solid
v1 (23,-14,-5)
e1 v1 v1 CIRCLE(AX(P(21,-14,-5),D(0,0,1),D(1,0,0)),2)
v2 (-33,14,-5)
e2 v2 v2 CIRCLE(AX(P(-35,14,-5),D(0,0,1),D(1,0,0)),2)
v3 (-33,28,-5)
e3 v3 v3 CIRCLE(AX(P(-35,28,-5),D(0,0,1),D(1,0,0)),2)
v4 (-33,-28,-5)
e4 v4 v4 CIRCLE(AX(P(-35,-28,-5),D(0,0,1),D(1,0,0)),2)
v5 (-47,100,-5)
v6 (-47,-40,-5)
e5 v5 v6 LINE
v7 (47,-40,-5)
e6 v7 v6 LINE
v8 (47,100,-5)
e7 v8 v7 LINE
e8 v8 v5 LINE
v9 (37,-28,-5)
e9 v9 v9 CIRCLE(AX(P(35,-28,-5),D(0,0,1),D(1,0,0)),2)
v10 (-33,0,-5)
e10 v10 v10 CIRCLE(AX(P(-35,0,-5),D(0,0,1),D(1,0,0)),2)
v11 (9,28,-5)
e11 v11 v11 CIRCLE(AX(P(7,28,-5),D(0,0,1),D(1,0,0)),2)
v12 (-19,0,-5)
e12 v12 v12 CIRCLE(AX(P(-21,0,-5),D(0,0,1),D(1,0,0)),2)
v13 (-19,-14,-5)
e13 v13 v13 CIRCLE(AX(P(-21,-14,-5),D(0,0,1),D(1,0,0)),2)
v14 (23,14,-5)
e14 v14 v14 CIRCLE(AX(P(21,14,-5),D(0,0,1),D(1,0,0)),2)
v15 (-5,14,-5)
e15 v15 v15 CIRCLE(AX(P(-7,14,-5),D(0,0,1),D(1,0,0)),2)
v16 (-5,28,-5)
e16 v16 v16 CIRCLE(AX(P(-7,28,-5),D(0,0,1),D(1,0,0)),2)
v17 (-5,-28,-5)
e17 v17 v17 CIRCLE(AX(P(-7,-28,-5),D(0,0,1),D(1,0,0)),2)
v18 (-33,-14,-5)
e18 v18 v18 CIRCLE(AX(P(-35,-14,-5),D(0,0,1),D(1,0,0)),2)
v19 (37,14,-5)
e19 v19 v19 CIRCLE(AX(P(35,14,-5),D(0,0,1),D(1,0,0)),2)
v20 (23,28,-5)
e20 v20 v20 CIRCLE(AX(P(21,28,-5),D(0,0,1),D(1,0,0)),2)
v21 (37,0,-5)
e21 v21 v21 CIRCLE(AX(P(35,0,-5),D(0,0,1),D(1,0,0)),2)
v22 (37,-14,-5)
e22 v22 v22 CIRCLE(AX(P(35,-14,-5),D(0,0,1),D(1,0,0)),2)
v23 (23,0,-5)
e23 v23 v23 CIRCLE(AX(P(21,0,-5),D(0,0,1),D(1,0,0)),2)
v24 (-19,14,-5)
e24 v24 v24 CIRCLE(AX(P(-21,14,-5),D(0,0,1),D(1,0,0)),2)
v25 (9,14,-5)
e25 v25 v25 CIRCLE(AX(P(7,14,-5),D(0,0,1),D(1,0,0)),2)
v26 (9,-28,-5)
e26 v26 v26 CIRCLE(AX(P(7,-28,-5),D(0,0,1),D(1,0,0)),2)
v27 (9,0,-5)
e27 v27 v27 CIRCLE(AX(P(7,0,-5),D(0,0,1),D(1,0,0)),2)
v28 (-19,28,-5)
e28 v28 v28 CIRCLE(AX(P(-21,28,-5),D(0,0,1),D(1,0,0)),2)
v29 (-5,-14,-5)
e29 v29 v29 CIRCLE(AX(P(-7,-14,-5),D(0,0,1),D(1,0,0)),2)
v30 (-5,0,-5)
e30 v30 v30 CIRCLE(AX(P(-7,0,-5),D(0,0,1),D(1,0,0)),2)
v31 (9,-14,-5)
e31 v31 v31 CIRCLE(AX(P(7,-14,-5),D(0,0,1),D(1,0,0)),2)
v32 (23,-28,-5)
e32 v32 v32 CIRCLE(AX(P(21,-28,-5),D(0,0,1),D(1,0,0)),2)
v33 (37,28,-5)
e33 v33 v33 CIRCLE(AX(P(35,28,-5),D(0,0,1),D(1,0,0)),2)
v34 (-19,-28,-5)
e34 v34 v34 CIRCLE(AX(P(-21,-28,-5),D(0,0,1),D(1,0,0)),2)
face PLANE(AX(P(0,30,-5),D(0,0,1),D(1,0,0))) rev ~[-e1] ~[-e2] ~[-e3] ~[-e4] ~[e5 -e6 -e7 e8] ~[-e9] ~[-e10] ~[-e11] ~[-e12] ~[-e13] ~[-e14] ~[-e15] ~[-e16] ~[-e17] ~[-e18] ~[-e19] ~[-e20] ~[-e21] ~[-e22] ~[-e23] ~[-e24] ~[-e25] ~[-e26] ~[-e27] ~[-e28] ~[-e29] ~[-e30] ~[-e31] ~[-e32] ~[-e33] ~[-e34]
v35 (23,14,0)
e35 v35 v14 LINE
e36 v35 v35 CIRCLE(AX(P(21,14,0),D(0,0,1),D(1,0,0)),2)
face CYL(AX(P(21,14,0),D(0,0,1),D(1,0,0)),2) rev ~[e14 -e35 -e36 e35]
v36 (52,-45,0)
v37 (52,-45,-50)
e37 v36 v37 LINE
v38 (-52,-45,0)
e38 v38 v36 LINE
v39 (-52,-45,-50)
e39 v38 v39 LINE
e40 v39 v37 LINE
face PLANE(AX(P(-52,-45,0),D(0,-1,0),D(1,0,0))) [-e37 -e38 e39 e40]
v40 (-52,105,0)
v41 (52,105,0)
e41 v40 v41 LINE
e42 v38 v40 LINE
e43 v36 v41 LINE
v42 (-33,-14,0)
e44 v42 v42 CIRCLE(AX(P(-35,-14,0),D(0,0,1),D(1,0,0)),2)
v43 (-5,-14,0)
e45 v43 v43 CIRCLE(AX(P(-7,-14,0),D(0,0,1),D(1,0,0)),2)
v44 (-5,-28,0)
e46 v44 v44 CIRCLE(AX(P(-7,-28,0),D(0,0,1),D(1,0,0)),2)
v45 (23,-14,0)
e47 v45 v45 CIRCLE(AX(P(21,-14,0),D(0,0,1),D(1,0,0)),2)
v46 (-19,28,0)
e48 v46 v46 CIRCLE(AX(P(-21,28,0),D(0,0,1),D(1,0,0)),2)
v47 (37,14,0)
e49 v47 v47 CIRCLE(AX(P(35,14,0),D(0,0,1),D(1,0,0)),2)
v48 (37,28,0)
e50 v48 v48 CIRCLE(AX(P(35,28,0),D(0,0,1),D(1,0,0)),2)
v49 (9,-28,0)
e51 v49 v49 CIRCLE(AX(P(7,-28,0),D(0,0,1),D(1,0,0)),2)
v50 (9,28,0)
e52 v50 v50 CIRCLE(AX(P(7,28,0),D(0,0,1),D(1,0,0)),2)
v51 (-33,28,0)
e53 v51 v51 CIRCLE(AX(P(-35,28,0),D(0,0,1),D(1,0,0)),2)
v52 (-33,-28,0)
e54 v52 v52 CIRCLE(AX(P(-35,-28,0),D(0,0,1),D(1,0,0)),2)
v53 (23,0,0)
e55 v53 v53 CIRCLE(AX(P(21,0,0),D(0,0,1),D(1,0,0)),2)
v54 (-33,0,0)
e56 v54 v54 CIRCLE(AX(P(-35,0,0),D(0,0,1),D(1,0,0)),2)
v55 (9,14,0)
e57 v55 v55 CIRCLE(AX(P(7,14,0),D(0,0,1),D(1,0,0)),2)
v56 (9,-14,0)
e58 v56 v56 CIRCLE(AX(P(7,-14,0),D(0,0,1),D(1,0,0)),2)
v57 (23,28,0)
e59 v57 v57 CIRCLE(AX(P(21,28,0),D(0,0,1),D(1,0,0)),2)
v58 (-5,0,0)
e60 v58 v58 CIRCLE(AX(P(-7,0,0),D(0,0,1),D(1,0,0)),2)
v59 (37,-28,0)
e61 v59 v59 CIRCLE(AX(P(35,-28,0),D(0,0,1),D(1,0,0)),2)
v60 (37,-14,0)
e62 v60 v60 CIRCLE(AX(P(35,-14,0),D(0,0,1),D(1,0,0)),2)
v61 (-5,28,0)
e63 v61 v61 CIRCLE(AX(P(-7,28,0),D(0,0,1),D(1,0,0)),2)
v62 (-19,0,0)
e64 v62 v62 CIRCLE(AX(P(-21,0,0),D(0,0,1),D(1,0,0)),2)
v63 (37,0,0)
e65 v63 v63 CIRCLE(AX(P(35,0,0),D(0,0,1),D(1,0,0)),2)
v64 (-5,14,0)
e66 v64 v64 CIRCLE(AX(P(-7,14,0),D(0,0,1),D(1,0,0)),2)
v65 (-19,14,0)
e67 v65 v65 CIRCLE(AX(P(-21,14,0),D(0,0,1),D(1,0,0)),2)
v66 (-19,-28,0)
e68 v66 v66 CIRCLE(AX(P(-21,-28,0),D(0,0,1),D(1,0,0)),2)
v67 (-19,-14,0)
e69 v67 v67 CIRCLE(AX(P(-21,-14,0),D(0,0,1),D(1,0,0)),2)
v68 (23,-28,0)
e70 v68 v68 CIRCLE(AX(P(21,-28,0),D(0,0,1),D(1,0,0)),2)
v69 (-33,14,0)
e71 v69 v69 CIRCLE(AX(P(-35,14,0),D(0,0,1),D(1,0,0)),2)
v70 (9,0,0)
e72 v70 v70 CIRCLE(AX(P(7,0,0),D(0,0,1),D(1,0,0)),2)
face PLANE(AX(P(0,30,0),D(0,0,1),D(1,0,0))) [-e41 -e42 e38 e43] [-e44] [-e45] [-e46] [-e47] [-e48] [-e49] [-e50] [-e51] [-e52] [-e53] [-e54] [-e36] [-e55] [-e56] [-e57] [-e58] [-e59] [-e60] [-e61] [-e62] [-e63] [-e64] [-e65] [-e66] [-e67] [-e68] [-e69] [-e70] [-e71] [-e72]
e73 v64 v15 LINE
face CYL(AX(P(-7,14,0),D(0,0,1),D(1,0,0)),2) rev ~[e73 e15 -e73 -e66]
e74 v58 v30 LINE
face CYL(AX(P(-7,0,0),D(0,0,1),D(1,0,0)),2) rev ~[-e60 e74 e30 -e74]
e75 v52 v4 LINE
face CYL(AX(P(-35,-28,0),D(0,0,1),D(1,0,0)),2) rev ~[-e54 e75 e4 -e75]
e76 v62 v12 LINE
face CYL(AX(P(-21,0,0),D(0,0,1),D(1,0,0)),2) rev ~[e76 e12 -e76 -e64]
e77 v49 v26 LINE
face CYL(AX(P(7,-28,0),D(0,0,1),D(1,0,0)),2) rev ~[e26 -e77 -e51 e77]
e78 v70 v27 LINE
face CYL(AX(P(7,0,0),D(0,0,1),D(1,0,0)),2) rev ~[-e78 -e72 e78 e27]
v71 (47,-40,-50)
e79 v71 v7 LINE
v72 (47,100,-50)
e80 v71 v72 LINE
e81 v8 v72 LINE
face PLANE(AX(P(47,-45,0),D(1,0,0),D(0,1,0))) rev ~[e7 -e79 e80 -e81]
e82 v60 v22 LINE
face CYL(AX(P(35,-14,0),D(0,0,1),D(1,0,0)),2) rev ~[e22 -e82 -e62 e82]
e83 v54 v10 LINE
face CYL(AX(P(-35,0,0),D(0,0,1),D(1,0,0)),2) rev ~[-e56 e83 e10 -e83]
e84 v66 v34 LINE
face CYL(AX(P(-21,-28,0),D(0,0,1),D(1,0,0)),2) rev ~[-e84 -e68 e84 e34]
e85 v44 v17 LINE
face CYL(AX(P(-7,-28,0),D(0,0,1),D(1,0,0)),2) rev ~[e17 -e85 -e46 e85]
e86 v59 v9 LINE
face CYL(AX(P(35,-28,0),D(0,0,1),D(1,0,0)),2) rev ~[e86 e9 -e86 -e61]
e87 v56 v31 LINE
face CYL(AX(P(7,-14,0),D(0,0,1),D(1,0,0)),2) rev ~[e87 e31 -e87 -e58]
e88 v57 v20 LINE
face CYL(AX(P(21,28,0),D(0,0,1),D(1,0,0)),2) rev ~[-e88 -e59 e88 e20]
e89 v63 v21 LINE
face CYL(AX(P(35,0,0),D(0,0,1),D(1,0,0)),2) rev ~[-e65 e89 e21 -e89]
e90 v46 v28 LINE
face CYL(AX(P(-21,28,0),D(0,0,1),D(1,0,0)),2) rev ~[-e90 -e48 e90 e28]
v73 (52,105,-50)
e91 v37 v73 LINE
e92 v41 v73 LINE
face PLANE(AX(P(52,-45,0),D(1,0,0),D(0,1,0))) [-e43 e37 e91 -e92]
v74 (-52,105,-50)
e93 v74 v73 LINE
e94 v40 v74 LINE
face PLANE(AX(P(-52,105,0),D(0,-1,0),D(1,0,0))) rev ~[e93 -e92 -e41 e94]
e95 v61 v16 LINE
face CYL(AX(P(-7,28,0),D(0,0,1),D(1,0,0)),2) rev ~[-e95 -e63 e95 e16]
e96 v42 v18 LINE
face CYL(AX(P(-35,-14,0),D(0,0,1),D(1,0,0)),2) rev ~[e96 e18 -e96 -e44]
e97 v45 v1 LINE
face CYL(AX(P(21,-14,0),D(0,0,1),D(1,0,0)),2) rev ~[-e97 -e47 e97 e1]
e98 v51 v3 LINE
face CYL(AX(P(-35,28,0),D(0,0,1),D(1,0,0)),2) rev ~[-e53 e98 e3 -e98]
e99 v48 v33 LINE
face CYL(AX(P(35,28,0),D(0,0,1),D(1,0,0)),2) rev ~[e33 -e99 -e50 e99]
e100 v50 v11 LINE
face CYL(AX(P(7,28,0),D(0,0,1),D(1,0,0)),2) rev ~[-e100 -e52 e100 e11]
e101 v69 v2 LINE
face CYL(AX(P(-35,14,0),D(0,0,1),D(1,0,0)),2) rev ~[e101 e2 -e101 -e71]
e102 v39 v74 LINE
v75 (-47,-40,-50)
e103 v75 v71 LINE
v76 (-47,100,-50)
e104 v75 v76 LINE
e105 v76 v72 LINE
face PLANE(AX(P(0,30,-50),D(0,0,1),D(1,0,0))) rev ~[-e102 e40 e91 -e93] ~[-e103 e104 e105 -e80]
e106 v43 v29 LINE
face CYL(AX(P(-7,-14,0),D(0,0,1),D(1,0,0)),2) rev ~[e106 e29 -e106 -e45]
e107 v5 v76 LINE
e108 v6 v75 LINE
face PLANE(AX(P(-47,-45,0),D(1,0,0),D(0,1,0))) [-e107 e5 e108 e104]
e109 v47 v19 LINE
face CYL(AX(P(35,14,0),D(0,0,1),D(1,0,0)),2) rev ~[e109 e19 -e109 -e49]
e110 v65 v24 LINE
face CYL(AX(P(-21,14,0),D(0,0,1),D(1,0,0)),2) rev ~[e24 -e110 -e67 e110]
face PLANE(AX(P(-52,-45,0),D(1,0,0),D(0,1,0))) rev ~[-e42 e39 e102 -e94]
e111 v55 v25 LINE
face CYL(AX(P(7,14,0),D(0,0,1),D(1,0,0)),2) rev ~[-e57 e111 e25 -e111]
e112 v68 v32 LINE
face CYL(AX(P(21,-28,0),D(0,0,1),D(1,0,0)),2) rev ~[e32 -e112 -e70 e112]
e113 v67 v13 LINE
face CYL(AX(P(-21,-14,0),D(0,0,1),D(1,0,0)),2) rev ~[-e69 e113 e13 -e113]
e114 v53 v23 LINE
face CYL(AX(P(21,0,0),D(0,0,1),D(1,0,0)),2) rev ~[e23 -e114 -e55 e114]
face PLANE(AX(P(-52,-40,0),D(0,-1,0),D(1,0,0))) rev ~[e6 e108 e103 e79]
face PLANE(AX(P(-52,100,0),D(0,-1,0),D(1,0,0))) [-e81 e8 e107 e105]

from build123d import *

# Parameters (mm, degrees)
F0_W     = 104
F0_H     = 150
F0_R     = 2
F1_DEPTH = 50
F2_T     = -5
F3_DEPTH = 25


# Not quite as in the source:
# - a feature names something its author has since deleted; it is built from what else it names


with BuildPart() as f1:
    # F0 (on Top) → F1 (new body)
    with BuildSketch(Plane.XY):
        with Locations((0, 30)):
            Rectangle(F0_W, F0_H)
        with Locations((-35, -28)):
            Circle(F0_R, mode=Mode.SUBTRACT)
        with Locations((-35, -14)):
            Circle(F0_R, mode=Mode.SUBTRACT)
        with Locations((-21, -28)):
            Circle(F0_R, mode=Mode.SUBTRACT)
        with Locations((-7, -28)):
            Circle(F0_R, mode=Mode.SUBTRACT)
        with Locations((-21, -14)):
            Circle(F0_R, mode=Mode.SUBTRACT)
        with Locations((-7, -14)):
            Circle(F0_R, mode=Mode.SUBTRACT)
        with Locations((-35, 0)):
            Circle(F0_R, mode=Mode.SUBTRACT)
        with Locations((-35, 14)):
            Circle(F0_R, mode=Mode.SUBTRACT)
        with Locations((-35, 28)):
            Circle(F0_R, mode=Mode.SUBTRACT)
        with Locations((-21, 0)):
            Circle(F0_R, mode=Mode.SUBTRACT)
        with Locations((-7, 0)):
            Circle(F0_R, mode=Mode.SUBTRACT)
        with Locations((-21, 14)):
            Circle(F0_R, mode=Mode.SUBTRACT)
        with Locations((-21, 28)):
            Circle(F0_R, mode=Mode.SUBTRACT)
        with Locations((-7, 14)):
            Circle(F0_R, mode=Mode.SUBTRACT)
        with Locations((-7, 28)):
            Circle(F0_R, mode=Mode.SUBTRACT)
        with Locations((7, -28)):
            Circle(F0_R, mode=Mode.SUBTRACT)
        with Locations((21, -28)):
            Circle(F0_R, mode=Mode.SUBTRACT)
        with Locations((7, -14)):
            Circle(F0_R, mode=Mode.SUBTRACT)
        with Locations((21, -14)):
            Circle(F0_R, mode=Mode.SUBTRACT)
        with Locations((35, -28)):
            Circle(F0_R, mode=Mode.SUBTRACT)
        with Locations((35, -14)):
            Circle(F0_R, mode=Mode.SUBTRACT)
        with Locations((7, 0)):
            Circle(F0_R, mode=Mode.SUBTRACT)
        with Locations((21, 0)):
            Circle(F0_R, mode=Mode.SUBTRACT)
        with Locations((7, 14)):
            Circle(F0_R, mode=Mode.SUBTRACT)
        with Locations((7, 28)):
            Circle(F0_R, mode=Mode.SUBTRACT)
        with Locations((21, 14)):
            Circle(F0_R, mode=Mode.SUBTRACT)
        with Locations((21, 28)):
            Circle(F0_R, mode=Mode.SUBTRACT)
        with Locations((35, 0)):
            Circle(F0_R, mode=Mode.SUBTRACT)
        with Locations((35, 14)):
            Circle(F0_R, mode=Mode.SUBTRACT)
        with Locations((35, 28)):
            Circle(F0_R, mode=Mode.SUBTRACT)
        with Locations((7, -28)):
            Circle(F0_R)
        with Locations((35, 14)):
            Circle(F0_R)
        with Locations((21, 0)):
            Circle(F0_R)
        with Locations((21, 28)):
            Circle(F0_R)
        with Locations((7, 28)):
            Circle(F0_R)
        with Locations((35, -28)):
            Circle(F0_R)
        with Locations((-7, -14)):
            Circle(F0_R)
        with Locations((-7, -28)):
            Circle(F0_R)
        with Locations((7, 14)):
            Circle(F0_R)
        with Locations((-35, 28)):
            Circle(F0_R)
        with Locations((-35, 14)):
            Circle(F0_R)
        with Locations((-35, 0)):
            Circle(F0_R)
        with Locations((-35, -14)):
            Circle(F0_R)
        with Locations((-35, -28)):
            Circle(F0_R)
        with Locations((-21, 28)):
            Circle(F0_R)
        with Locations((-21, 14)):
            Circle(F0_R)
        with Locations((-21, 0)):
            Circle(F0_R)
        with Locations((-21, -14)):
            Circle(F0_R)
        with Locations((-21, -28)):
            Circle(F0_R)
        with Locations((-7, 28)):
            Circle(F0_R)
        with Locations((-7, 14)):
            Circle(F0_R)
        with Locations((-7, 0)):
            Circle(F0_R)
        with Locations((35, 0)):
            Circle(F0_R)
        with Locations((21, -14)):
            Circle(F0_R)
        with Locations((21, 14)):
            Circle(F0_R)
        with Locations((7, 0)):
            Circle(F0_R)
        with Locations((35, -14)):
            Circle(F0_R)
        with Locations((21, -28)):
            Circle(F0_R)
        with Locations((7, -14)):
            Circle(F0_R)
        with Locations((35, 28)):
            Circle(F0_R)
    extrude(amount=-F1_DEPTH)

    # F2
    f2_openings = [f1.faces().sort_by_distance(p)[0] for p in [
        (0, 30, -50),
    ]]
    offset(amount=F2_T, openings=f2_openings)

    # F0 (on Top) → F3 (cut)
    with BuildSketch(Plane.XY):
        with Locations((7, -14)):
            Circle(F0_R)
        with Locations((35, -14)):
            Circle(F0_R)
        with Locations((21, -28)):
            Circle(F0_R)
        with Locations((7, 0)):
            Circle(F0_R)
        with Locations((21, 14)):
            Circle(F0_R)
        with Locations((21, -14)):
            Circle(F0_R)
        with Locations((35, 0)):
            Circle(F0_R)
        with Locations((-7, 0)):
            Circle(F0_R)
        with Locations((-7, 14)):
            Circle(F0_R)
        with Locations((-7, 28)):
            Circle(F0_R)
        with Locations((-21, -28)):
            Circle(F0_R)
        with Locations((-21, -14)):
            Circle(F0_R)
        with Locations((-21, 0)):
            Circle(F0_R)
        with Locations((-21, 14)):
            Circle(F0_R)
        with Locations((-35, -28)):
            Circle(F0_R)
        with Locations((-35, -14)):
            Circle(F0_R)
        with Locations((-35, 0)):
            Circle(F0_R)
        with Locations((7, 14)):
            Circle(F0_R)
        with Locations((-7, -28)):
            Circle(F0_R)
        with Locations((-7, -14)):
            Circle(F0_R)
        with Locations((7, 28)):
            Circle(F0_R)
        with Locations((35, -28)):
            Circle(F0_R)
        with Locations((21, 28)):
            Circle(F0_R)
        with Locations((21, 0)):
            Circle(F0_R)
        with Locations((35, 14)):
            Circle(F0_R)
        with Locations((7, -28)):
            Circle(F0_R)
        with Locations((35, 28)):
            Circle(F0_R)
        with Locations((-21, 28)):
            Circle(F0_R)
        with Locations((-35, 14)):
            Circle(F0_R)
        with Locations((-35, 28)):
            Circle(F0_R)
    extrude(amount=-F3_DEPTH, mode=Mode.SUBTRACT)


solid = f1.part
